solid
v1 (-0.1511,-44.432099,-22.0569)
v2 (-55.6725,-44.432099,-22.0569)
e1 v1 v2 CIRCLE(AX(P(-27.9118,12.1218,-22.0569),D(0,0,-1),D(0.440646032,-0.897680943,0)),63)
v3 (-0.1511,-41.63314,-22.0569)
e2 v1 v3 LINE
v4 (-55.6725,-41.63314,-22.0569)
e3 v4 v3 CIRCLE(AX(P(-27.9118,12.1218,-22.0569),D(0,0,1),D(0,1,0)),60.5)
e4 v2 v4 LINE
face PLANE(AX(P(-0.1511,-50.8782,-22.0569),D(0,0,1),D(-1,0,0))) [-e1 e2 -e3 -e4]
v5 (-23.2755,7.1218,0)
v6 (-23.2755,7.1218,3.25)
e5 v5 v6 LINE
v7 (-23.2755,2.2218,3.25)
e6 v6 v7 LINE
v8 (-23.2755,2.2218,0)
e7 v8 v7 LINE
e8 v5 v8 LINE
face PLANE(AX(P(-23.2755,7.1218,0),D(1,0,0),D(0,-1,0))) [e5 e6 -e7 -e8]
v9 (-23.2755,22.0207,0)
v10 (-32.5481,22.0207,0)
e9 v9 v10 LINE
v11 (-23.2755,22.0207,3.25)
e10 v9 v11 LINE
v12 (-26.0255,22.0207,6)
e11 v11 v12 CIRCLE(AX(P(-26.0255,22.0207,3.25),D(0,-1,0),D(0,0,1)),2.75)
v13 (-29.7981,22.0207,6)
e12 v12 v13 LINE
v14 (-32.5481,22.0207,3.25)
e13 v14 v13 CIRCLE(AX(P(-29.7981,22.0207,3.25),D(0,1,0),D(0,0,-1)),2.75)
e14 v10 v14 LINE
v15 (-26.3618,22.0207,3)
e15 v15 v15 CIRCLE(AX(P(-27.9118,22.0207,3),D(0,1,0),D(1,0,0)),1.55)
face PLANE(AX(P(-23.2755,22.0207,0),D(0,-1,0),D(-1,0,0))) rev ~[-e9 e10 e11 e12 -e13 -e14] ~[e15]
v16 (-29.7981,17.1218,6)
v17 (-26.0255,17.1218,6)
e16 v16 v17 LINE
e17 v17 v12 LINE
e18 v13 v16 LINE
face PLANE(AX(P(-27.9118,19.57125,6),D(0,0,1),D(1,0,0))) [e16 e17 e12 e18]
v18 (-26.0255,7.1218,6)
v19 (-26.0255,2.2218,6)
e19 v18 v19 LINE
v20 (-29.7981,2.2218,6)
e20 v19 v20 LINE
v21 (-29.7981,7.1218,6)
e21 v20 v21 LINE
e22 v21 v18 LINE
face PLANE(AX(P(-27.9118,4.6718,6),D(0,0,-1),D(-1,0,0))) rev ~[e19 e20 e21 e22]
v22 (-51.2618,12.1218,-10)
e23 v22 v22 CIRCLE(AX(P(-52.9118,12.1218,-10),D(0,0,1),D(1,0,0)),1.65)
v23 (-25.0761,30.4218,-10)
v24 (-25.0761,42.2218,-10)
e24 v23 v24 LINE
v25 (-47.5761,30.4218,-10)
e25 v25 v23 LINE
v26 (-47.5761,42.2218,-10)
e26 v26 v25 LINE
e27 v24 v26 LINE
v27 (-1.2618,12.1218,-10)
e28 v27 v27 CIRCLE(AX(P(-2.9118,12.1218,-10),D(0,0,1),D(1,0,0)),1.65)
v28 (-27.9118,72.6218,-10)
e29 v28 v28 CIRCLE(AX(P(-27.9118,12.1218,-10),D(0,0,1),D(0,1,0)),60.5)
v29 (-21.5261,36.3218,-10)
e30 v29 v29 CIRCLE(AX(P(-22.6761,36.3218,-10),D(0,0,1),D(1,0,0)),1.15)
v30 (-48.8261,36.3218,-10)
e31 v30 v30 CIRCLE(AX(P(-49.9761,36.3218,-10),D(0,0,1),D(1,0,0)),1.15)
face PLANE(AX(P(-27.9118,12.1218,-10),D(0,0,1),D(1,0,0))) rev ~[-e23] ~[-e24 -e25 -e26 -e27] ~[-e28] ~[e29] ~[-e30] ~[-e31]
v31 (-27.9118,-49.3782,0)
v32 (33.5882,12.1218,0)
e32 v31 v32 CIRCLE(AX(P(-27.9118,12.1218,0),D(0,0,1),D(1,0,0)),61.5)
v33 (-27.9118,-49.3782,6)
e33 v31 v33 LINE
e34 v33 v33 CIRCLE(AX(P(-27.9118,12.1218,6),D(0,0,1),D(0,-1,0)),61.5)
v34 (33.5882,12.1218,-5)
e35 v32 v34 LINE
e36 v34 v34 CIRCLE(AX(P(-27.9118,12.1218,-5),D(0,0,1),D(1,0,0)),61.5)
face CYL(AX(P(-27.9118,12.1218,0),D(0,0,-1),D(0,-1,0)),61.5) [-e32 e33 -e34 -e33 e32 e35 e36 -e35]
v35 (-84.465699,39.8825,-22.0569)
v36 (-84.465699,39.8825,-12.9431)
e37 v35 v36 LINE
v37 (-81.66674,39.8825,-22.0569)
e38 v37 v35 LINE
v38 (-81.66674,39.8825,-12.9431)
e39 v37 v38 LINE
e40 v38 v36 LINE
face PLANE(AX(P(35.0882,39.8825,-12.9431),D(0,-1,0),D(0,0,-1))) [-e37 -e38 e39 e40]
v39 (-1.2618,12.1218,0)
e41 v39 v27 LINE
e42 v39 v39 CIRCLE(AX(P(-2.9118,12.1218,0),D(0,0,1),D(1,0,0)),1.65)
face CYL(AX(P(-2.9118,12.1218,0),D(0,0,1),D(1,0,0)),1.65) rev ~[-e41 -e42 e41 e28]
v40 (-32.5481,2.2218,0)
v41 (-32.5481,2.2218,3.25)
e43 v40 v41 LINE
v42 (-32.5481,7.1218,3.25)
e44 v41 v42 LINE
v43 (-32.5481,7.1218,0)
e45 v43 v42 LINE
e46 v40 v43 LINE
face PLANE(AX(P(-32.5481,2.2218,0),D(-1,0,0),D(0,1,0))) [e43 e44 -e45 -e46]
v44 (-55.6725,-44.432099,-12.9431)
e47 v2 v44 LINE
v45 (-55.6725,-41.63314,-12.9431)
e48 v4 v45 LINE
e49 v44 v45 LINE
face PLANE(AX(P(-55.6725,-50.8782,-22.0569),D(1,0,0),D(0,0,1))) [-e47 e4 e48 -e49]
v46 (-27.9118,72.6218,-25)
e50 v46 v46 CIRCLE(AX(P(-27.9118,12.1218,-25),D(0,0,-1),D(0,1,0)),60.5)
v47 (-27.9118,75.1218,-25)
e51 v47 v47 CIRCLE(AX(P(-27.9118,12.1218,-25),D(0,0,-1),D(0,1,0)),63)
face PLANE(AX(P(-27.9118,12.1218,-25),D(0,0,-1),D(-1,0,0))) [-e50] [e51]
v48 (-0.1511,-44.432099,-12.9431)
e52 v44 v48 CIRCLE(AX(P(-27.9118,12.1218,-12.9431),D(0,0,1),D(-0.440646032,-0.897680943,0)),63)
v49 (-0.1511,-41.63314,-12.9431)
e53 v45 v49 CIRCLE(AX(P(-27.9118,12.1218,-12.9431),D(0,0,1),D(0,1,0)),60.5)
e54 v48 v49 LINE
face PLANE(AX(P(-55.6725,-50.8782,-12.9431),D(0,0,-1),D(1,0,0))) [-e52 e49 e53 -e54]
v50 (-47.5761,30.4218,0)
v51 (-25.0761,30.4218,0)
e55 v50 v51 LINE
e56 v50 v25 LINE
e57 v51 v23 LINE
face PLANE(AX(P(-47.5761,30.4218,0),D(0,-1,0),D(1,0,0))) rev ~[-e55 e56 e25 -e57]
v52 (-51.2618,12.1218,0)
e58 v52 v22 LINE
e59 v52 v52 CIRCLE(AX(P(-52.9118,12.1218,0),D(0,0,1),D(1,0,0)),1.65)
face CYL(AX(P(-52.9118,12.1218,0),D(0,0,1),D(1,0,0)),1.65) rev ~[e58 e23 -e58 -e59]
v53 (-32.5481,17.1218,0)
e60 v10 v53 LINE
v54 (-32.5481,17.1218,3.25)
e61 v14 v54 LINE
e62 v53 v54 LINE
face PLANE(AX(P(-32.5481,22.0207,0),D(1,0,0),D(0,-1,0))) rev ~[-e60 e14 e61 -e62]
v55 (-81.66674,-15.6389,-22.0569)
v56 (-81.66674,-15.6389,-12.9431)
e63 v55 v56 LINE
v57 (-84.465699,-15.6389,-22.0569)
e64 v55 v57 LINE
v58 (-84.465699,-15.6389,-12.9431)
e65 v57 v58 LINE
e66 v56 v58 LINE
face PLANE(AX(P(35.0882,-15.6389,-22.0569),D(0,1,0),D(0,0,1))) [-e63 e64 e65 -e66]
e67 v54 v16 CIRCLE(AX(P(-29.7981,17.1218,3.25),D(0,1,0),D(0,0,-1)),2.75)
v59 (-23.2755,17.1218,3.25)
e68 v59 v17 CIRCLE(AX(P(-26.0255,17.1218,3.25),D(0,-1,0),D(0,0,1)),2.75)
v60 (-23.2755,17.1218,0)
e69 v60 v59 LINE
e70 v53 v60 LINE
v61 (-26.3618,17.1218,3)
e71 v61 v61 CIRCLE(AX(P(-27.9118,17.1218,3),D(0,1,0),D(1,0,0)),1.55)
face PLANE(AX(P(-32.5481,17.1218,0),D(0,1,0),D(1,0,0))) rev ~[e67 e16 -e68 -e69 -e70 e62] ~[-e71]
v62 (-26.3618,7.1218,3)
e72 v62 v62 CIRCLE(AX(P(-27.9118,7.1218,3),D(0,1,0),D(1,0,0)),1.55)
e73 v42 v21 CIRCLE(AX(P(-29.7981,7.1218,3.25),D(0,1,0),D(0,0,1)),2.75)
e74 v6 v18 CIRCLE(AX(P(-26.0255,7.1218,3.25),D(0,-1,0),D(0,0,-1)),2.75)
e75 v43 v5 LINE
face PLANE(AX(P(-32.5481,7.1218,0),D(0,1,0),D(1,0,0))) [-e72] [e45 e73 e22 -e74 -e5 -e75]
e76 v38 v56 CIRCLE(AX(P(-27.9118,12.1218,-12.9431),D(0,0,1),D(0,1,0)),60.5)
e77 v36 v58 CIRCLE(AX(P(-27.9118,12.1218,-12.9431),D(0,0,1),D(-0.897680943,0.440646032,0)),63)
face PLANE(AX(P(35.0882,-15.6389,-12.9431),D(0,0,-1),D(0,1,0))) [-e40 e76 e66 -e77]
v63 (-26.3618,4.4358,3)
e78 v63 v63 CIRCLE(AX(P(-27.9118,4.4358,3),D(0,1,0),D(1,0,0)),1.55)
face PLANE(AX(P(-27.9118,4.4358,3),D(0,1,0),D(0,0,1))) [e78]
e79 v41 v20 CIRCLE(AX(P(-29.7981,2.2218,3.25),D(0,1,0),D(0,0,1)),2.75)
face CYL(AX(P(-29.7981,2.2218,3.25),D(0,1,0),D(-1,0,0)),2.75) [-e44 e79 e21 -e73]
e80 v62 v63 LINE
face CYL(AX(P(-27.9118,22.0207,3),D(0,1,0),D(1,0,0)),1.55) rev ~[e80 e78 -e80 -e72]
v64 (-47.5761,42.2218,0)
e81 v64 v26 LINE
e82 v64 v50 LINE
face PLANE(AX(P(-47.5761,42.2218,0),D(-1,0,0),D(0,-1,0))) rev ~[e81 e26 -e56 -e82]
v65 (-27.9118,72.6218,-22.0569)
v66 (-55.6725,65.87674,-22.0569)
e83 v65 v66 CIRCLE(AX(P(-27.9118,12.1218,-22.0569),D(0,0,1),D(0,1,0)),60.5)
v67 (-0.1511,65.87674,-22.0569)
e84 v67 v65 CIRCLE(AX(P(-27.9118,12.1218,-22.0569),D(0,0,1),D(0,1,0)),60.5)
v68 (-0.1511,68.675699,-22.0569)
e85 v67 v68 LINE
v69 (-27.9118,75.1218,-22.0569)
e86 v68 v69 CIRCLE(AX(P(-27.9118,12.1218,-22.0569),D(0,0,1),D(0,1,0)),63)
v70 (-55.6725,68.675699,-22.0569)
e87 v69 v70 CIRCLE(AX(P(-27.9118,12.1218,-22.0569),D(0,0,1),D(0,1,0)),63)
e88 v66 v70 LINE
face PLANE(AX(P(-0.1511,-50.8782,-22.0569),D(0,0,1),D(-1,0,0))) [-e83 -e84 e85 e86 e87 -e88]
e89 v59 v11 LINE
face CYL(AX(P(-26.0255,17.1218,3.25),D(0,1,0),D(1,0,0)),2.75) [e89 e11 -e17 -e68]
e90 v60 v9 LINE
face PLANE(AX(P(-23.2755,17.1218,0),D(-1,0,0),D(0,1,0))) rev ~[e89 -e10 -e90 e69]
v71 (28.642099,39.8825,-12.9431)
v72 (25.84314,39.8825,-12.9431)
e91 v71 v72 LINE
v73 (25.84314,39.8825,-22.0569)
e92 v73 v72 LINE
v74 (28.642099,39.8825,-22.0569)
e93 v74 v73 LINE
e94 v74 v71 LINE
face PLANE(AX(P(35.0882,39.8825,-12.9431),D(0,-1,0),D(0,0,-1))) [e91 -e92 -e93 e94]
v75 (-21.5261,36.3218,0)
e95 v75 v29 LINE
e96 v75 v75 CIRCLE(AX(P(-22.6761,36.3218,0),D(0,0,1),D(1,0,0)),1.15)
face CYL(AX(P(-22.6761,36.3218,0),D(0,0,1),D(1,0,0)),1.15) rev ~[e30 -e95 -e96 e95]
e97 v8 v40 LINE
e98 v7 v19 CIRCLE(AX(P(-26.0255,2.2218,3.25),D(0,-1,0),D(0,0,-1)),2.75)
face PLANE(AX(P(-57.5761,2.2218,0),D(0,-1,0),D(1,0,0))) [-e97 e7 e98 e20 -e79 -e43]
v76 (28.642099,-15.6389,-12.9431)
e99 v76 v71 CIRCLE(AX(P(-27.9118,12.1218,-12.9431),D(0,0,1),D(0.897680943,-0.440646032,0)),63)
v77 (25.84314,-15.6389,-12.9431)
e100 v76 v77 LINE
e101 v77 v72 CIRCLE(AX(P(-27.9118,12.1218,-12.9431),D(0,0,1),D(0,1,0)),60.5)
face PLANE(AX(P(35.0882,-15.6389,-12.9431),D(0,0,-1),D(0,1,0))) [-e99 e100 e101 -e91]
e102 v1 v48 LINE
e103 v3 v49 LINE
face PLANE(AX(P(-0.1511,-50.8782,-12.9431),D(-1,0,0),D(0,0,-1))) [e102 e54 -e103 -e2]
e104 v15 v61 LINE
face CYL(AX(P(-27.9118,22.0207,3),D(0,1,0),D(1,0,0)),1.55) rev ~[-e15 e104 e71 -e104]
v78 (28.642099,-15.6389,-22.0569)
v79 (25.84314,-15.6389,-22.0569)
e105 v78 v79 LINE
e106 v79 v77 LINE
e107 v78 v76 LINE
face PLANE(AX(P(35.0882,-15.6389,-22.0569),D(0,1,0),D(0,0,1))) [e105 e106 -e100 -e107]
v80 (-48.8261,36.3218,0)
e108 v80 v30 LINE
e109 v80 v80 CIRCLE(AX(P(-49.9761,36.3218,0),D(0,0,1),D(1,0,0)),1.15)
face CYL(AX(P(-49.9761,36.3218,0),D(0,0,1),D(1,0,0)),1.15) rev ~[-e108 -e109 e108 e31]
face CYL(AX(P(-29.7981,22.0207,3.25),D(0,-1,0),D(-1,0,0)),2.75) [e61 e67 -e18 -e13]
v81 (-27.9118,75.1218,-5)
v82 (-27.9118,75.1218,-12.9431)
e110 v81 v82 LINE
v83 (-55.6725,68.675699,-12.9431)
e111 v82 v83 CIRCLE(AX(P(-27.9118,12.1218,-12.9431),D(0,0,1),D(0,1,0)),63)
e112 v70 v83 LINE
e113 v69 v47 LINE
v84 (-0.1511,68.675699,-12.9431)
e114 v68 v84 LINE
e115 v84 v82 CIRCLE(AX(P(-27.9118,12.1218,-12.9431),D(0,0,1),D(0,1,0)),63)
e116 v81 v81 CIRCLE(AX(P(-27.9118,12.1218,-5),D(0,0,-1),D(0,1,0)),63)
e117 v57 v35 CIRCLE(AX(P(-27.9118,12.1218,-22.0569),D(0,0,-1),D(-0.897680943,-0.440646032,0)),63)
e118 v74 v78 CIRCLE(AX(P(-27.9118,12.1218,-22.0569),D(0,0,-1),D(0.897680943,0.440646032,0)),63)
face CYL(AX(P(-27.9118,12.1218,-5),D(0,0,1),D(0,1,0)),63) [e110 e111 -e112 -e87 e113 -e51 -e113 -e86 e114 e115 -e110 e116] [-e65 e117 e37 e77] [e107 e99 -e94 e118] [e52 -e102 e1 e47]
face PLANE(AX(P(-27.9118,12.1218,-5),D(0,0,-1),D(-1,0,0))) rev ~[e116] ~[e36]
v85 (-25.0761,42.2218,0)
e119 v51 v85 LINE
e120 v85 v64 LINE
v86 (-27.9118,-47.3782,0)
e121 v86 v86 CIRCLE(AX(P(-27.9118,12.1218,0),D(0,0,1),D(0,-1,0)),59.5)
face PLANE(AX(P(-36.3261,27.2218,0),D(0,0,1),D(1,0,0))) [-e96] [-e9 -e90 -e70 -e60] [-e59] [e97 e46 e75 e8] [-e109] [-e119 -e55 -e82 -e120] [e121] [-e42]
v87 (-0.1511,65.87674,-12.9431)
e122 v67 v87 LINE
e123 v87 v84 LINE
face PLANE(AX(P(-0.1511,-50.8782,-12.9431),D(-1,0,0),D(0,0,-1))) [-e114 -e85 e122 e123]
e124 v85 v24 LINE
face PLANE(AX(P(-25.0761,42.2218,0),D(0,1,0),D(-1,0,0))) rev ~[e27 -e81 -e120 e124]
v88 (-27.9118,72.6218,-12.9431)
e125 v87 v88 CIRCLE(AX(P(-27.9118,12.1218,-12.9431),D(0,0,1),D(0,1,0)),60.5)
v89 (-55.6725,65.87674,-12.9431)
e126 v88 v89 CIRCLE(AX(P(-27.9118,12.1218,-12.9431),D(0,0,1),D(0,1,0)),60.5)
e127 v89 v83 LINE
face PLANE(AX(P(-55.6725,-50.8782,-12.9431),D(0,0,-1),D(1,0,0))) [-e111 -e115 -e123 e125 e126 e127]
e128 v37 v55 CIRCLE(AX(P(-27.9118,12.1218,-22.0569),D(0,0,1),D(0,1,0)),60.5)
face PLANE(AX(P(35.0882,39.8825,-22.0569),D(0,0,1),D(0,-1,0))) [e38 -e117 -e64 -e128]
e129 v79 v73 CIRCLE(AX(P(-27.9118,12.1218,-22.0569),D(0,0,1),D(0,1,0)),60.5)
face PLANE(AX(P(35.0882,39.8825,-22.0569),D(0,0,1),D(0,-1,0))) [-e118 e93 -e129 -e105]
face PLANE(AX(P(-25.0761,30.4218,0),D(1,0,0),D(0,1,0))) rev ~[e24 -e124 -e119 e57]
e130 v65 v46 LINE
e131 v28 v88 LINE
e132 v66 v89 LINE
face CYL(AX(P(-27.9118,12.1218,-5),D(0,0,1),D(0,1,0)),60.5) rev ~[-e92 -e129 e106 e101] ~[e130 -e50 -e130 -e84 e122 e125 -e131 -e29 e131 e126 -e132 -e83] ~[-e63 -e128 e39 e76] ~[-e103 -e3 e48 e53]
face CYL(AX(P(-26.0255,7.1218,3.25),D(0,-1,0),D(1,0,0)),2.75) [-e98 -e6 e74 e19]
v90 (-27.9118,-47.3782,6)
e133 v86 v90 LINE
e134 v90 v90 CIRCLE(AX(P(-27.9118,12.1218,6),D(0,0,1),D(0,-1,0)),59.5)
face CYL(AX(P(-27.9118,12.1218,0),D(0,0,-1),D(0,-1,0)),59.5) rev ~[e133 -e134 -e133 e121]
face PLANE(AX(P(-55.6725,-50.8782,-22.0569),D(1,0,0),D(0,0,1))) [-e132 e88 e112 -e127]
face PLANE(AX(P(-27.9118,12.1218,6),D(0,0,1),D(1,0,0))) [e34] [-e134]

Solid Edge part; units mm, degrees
sketch "Sketch1" plane through (0, 0, 0) normal (0, 0, 1) x (1, 0, 0)
  line L0 (-15.0761, 2.2218) -> (-15.0761, 52.2218)
  line L1 (-15.0761, 52.2218) -> (-57.5761, 52.2218)
  line L2 (-57.5761, 52.2218) -> (-57.5761, 2.2218)
  line L3 (-57.5761, 2.2218) -> (-15.0761, 2.2218)
  line L4 (-25.0761, 30.4218) -> (-25.0761, 42.2218)
  line L5 (-25.0761, 42.2218) -> (-47.5761, 42.2218)
  line L6 (-47.5761, 42.2218) -> (-47.5761, 30.4218)
  line L7 (-47.5761, 30.4218) -> (-25.0761, 30.4218)
  dimension "D1" = 22.5
  dimension "D2" = 11.8
  dimension "D3" = 50
  dimension "D4" = 42.5
  dimension "D5" = 4.8989
  dimension "D6" = 4.9
  dimension "D7" = 10
  dimension "D8" = 10
  dimension "D9" = 10
extrude "Protrusion1" add sketch "Sketch1" against normal blind 10
sketch "Sketch2" plane through (0, 0, 0) normal (0, 0, 1) x (1, 0, 0)
  line L0 (-23.2755, 17.1218) -> (-23.2755, 22.0207)
  line L1 (-23.2755, 22.0207) -> (-32.5481, 22.0207)
  line L2 (-32.5481, 22.0207) -> (-32.5481, 17.1218)
  line L3 (-32.5481, 17.1218) -> (-23.2755, 17.1218)
  line L4 (-23.2755, 7.1218) -> (-23.2755, 2.2218)
  line L5 (-23.2755, 2.2218) -> (-32.5481, 2.2218)
  line L6 (-32.5481, 2.2218) -> (-32.5481, 7.1218)
  line L7 (-32.5481, 7.1218) -> (-23.2755, 7.1218)
  dimension "D1" = 22.5
  dimension "D2" = 11.8
  dimension "D3" = 50
  dimension "D4" = 42.5
  dimension "D5" = 4.8989
  dimension "D6" = 4.9
  dimension "D7" = 10
  dimension "D8" = 10
  dimension "D9" = 10
extrude "ExtrudedProtrusion_3" add sketch "Sketch2" along normal blind 6
sketch "Sketch3" plane through (-27.9118, 22.0207, 3) normal (0, 1, 0) x (1, 0, 0)
  circle A0 centre (0, 0) radius 1.55
extrude "ExtrudedCutout_1" cut sketch "Sketch3" against normal blind 17.5849
sketch "Sketch4" plane through (0, 0, 0) normal (0, 0, 1) x (1, 0, 0)
  circle A0 centre (-27.9118, 12.1218) radius 61.5
extrude "ExtrudedProtrusion_4" add sketch "Sketch4" against normal blind 10
sketch "Sketch5" plane through (0, 0, 0) normal (0, 0, 1) x (1, 0, 0)
  line L0 (-47.5761, 42.2218) -> (-47.5761, 30.4218)
  line L1 (-47.5761, 30.4218) -> (-25.0761, 30.4218)
  line L2 (-25.0761, 30.4218) -> (-25.0761, 42.2218)
  line L3 (-25.0761, 42.2218) -> (-47.5761, 42.2218)
extrude "ExtrudedCutout_2" cut sketch "Sketch5" against normal blind 44.8908
sketch "Sketch6" plane through (-27.9118, 12.1218, -5) normal (0, 0, -1) x (0, 1, 0)
  circle A0 centre (0, 0) radius 60.5
  circle A1 centre (0, 0) radius 63
extrude "ExtrudedProtrusion_6" add sketch "Sketch6" along normal blind 20
sketch "Sketch7" plane through (-27.9118, -50.8782, -15) normal (0, -1, 0) x (0, 0, 1)
  line L0 (-7.0569, 27.7607) -> (2.0569, 27.7607)
  line L1 (2.0569, 27.7607) -> (2.0569, -27.7607)
  line L2 (2.0569, -27.7607) -> (-7.0569, -27.7607)
  line L3 (-7.0569, -27.7607) -> (-7.0569, 27.7607)
extrude "ExtrudedCutout_3" cut sketch "Sketch7" against normal blind 172.1374
pattern_circular "Pattern_1" count 4 over 360 about axis through (-27.9118, 12.1218, -25) along (0, 0, 1) of "ExtrudedCutout_3"
sketch "Sketch8" plane through (-27.9118, 12.1218, 0) normal (0, 0, 1) x (0, -1, 0)
  circle A0 centre (0, 0) radius 59.5
  circle A1 centre (0, 0) radius 61.5
extrude "Protrusion2" add sketch "Sketch8" along normal blind 6
fillet "Round_1" radius 2.75 4 edges at (-32.5481, 4.6718, 6) (-23.2755, 4.6718, 6) (-32.5481, 19.5713, 6) (-23.2755, 19.5713, 6)
sketch "Sketch9" plane through (-27.9118, 12.1218, 0) normal (0, 0, 1) x (1, 0, 0)
  circle A0 centre (-22.0643, 24.2) radius 1.15
  circle A1 centre (5.2357, 24.2) radius 1.15
  dimension "D1" = 2.3
extrude "Cutout4" cut sketch "Sketch9" along normal mid plane 85.0753
sketch "Sketch10" plane through (-27.9118, 12.1218, 0) normal (0, 0, 1) x (1, 0, 0)
  circle A0 centre (-25, 0) radius 1.65
  circle A1 centre (25, 0) radius 1.65
  dimension "D1" = 50
  dimension "D2" = 3.3
extrude "ExtrudedCutout_8" cut sketch "Sketch10" along normal mid plane 174.1948
